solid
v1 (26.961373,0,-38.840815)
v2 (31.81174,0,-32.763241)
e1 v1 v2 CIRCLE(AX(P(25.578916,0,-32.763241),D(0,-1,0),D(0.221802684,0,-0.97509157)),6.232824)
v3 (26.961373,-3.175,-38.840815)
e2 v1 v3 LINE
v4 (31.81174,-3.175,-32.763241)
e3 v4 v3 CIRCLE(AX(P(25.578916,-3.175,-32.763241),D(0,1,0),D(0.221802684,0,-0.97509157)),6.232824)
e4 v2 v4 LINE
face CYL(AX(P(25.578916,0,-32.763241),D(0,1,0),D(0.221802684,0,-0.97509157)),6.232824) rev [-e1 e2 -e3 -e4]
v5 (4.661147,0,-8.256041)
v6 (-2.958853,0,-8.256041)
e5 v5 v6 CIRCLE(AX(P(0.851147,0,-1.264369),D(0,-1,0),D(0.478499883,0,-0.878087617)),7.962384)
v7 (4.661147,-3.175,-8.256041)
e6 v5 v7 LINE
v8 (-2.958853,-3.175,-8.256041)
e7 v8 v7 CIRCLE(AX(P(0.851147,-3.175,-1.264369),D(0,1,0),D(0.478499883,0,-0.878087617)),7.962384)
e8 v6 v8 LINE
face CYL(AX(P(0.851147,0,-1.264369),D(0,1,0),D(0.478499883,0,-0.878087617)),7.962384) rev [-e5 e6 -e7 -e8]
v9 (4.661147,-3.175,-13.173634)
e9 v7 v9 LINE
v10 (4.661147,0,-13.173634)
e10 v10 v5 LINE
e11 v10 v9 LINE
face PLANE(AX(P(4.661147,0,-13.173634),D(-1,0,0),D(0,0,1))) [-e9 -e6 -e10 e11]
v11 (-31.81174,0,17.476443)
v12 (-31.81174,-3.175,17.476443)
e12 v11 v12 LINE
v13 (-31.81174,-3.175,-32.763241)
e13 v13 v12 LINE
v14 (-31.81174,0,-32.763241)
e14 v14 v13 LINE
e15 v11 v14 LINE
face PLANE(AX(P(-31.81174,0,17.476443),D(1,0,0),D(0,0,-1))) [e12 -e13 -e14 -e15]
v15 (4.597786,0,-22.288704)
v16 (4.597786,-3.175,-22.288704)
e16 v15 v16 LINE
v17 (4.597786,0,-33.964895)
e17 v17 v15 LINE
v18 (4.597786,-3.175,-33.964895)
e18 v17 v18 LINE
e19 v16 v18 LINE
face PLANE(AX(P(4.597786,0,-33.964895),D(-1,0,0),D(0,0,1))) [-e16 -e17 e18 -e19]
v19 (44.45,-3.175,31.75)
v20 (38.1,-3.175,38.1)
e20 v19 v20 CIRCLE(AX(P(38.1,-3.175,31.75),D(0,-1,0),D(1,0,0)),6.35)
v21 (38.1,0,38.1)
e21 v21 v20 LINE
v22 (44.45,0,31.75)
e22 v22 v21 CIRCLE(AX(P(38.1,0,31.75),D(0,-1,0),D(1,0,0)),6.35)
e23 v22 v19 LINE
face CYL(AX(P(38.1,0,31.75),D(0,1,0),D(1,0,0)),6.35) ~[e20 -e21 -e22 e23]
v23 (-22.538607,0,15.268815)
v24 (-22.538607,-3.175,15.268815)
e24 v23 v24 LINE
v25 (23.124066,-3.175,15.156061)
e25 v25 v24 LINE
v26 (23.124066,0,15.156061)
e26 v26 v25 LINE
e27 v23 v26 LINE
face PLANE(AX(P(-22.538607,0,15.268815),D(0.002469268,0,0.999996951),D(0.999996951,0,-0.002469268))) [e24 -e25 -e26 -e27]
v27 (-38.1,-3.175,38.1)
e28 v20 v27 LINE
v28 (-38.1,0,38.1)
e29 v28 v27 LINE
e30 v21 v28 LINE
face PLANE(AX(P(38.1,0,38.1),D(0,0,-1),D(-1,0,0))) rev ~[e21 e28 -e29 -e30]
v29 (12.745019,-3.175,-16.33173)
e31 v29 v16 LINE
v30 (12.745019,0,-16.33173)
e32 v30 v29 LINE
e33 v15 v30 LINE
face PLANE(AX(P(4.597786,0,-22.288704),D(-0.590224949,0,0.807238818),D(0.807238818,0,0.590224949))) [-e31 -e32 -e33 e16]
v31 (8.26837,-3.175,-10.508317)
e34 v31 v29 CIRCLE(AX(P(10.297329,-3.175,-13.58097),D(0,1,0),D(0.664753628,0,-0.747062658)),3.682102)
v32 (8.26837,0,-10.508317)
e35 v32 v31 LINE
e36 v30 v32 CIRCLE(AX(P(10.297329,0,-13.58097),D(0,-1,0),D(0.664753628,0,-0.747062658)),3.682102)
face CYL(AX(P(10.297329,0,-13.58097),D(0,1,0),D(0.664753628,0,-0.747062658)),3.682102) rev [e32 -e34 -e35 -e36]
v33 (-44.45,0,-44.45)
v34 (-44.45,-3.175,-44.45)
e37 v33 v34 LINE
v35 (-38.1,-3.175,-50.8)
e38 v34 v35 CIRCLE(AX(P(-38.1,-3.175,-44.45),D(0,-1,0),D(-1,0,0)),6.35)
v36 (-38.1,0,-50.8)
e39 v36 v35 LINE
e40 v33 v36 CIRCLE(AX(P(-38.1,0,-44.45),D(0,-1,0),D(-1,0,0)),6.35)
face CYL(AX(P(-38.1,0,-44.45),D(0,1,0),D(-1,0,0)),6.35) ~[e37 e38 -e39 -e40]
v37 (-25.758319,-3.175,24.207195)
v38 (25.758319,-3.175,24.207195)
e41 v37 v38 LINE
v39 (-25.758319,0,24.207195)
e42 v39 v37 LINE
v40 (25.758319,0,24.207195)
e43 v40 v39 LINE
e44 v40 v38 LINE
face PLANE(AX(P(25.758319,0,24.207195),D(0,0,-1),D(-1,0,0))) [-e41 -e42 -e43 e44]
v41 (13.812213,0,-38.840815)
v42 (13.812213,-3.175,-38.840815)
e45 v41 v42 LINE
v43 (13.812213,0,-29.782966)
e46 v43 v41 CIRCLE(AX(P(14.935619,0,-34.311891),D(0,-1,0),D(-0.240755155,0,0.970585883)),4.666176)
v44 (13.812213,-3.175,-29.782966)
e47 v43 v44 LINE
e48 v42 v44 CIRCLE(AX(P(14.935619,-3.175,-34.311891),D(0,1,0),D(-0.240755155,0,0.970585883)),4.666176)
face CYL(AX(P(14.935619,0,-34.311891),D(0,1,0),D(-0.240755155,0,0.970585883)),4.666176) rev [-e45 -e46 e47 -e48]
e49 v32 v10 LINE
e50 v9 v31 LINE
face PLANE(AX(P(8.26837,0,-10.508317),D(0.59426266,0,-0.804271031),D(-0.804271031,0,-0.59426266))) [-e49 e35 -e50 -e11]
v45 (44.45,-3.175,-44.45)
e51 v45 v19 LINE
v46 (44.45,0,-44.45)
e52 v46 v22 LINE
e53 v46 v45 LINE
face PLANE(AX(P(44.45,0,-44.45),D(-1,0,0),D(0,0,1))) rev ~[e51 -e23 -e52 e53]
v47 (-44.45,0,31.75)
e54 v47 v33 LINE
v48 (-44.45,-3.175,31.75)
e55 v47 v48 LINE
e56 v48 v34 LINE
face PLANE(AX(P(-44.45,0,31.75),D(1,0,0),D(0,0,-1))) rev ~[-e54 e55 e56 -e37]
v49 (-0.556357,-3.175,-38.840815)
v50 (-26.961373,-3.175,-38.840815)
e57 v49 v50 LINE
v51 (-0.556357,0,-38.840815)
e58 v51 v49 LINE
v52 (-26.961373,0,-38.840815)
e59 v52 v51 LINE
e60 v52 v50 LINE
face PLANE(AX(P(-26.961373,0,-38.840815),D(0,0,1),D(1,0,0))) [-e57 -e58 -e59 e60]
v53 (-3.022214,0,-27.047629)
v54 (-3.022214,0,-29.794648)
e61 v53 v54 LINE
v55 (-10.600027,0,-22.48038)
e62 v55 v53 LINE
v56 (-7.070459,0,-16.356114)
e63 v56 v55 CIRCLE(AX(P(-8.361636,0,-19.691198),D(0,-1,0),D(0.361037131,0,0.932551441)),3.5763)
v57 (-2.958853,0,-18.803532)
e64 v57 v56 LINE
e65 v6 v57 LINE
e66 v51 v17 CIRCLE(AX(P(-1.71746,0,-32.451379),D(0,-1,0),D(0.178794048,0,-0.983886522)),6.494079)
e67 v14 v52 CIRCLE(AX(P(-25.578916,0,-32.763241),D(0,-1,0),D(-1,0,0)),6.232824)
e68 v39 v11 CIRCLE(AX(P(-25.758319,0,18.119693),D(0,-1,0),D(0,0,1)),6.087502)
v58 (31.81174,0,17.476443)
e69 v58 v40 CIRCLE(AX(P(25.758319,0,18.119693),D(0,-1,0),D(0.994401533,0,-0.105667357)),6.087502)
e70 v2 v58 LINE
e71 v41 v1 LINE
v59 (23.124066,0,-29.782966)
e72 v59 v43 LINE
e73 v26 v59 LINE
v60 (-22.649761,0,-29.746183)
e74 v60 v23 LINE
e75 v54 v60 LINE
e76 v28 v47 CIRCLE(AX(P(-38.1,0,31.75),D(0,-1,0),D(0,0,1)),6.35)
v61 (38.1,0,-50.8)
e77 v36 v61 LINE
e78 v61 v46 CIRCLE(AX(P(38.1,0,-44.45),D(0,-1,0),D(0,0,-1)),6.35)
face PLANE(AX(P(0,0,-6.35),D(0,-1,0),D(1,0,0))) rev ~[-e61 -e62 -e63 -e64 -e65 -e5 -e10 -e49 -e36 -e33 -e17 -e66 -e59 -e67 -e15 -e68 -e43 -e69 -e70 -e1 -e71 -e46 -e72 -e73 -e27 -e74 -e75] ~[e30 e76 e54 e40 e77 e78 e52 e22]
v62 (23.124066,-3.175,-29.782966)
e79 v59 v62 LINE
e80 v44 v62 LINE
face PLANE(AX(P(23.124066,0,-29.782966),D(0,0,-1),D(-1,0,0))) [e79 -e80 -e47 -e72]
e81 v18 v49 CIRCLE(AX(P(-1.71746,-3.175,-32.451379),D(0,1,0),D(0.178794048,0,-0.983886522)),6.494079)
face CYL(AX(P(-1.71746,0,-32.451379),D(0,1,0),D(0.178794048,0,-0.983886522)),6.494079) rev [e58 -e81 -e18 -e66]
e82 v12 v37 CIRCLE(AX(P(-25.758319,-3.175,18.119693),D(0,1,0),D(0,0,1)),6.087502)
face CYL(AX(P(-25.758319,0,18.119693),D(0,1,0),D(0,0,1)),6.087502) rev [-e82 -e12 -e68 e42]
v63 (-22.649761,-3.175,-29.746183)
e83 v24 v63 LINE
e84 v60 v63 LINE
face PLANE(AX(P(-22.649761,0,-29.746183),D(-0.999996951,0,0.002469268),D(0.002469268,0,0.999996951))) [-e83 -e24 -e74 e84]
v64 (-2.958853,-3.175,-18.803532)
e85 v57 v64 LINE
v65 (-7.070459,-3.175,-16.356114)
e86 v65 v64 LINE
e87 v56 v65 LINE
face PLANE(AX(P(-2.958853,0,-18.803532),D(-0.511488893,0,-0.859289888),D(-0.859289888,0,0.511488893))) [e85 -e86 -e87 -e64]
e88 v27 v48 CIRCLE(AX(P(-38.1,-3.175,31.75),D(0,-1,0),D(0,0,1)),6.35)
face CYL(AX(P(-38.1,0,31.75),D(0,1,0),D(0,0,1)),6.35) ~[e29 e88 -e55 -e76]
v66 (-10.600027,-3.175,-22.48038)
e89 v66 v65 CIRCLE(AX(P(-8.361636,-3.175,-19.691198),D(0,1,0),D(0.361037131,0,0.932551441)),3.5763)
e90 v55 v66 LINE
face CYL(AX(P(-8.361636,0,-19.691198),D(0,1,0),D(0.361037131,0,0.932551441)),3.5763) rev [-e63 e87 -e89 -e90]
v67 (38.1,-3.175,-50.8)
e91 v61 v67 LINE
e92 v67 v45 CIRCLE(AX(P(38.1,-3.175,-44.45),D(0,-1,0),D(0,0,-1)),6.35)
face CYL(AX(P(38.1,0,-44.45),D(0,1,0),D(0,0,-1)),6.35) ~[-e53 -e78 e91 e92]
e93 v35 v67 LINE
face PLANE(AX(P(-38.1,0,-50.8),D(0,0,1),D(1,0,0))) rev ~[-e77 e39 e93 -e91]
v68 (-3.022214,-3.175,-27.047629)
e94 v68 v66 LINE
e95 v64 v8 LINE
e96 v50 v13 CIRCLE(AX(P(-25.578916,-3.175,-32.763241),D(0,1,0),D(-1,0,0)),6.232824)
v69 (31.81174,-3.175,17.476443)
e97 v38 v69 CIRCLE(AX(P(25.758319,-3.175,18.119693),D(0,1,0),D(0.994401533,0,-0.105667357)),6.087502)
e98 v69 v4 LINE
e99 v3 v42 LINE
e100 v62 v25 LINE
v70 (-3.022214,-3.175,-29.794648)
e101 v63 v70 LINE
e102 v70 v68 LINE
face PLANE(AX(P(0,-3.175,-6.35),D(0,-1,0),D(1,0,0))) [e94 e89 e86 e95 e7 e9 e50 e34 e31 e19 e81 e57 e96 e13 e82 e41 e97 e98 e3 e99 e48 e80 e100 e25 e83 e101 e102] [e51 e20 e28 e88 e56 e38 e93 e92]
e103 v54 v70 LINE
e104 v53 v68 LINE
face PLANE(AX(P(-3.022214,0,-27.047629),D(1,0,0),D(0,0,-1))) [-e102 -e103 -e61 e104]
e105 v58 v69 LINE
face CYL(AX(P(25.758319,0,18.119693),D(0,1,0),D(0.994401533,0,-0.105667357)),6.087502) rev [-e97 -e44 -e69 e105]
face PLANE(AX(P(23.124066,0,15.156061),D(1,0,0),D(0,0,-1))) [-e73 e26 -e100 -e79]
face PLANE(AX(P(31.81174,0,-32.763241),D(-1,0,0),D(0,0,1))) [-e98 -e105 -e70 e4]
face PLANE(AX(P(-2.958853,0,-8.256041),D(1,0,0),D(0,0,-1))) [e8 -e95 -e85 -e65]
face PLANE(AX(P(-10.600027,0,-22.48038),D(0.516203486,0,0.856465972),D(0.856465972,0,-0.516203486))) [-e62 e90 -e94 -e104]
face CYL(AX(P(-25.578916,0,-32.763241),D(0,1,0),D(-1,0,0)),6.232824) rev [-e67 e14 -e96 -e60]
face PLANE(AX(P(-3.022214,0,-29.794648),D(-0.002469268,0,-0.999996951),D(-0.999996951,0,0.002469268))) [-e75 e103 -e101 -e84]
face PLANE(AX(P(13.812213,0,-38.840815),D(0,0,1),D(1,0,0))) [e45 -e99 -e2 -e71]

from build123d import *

# Parameters (mm, degrees)
F2_DEPTH = 3.175
F3_DEPTH = 6.35


# Not quite as in the source:
# - a feature of the source that left no trace in its solid (it failed there, or was rolled back) is left out


with BuildPart() as f2:
    # F1 (on Front) → F2 (new body)
    with BuildSketch(Plane.XZ):
        with BuildLine():
            Line((38.1, 38.1), (-38.1, 38.1))
            ThreePointArc((-38.1, 38.1), (-42.5901280605, 36.2401280605), (-44.45, 31.75))
            Line((-44.45, 31.75), (-44.45, -44.45))
            ThreePointArc((-44.45, -44.45), (-42.5901280605, -48.9401280605), (-38.1, -50.8))
            Line((-38.1, -50.8), (38.1, -50.8))
            ThreePointArc((38.1, -50.8), (42.5901280605, -48.9401280605), (44.45, -44.45))
            Line((44.45, -44.45), (44.45, 31.75))
            ThreePointArc((44.45, 31.75), (42.5901280605, 36.2401280605), (38.1, 38.1))
        make_face()
    extrude(amount=F2_DEPTH)

    # F0 (on Front) → F3 (cut)
    with BuildSketch(Plane.XZ):
        with BuildLine():
            Line((-22.538606504, 15.2688146872), (23.1240657176, 15.1560609504))
            Line((23.1240657176, 15.1560609504), (23.1240657176, -29.7829657793))
            Line((23.1240657176, -29.7829657793), (13.8122134028, -29.7829657793))
            ThreePointArc((13.8122134028, -29.7829657793), (10.2694431158, -34.3118906021), (13.8122134028, -38.8408154249))
            Line((13.8122134028, -38.8408154249), (26.9613731652, -38.8408154249))
            ThreePointArc((26.9613731652, -38.8408154249), (30.4505025307, -36.6511380231), (31.8117402494, -32.7632410691))
            Line((31.8117402494, -32.7632410691), (31.8117402494, 17.4764426589))
            ThreePointArc((31.8117402494, 17.4764426589), (30.2845461796, 22.1904359309), (25.758318603, 24.2071952671))
            Line((25.758318603, 24.2071952671), (0, 24.2071952671))
            Line((0, 24.2071952671), (-25.758318603, 24.2071952671))
            ThreePointArc((-25.758318603, 24.2071952671), (-30.2845461796, 22.1904359309), (-31.8117402494, 17.4764426589))
            Line((-31.8117402494, 17.4764426589), (-31.8117402494, -32.7632410691))
            ThreePointArc((-31.8117402494, -32.7632410691), (-30.4505025307, -36.6511380231), (-26.9613731652, -38.8408154249))
            Line((-26.9613731652, -38.8408154249), (-0.5563573561, -38.8408154249))
            ThreePointArc((-0.5563573561, -38.8408154249), (2.7454534653, -37.1689483611), (4.597785615, -33.964894712))
            Line((4.597785615, -33.964894712), (4.597785615, -22.288704291))
            Line((4.597785615, -22.288704291), (12.7450192465, -16.3317304105))
            ThreePointArc((12.7450192465, -16.3317304105), (13.2165532375, -11.3368660938), (8.2683697798, -10.508316569))
            Line((8.2683697798, -10.508316569), (4.6611472023, -13.1736341055))
            Line((4.6611472023, -13.1736341055), (4.6611472023, -8.2560405135))
            ThreePointArc((4.6611472023, -8.2560405135), (0.8511472023, 6.6980150241), (-2.9588527977, -8.2560405135))
            Line((-2.9588527977, -8.2560405135), (-2.9588527977, -18.8035315381))
            Line((-2.9588527977, -18.8035315381), (-7.0704589598, -16.3561142981))
            ThreePointArc((-7.0704589598, -16.3561142981), (-11.4601778268, -17.9054311979), (-10.6000266969, -22.4803797901))
            Line((-10.6000266969, -22.4803797901), (-3.022214385, -27.0476285368))
            Line((-3.022214385, -27.0476285368), (-3.022214385, -29.7946484487))
            Line((-3.022214385, -29.7946484487), (-22.6497609527, -29.7461826206))
            Line((-22.6497609527, -29.7461826206), (-22.538606504, 15.2688146872))
        make_face()
    extrude(amount=F3_DEPTH, mode=Mode.SUBTRACT)


solid = f2.part
